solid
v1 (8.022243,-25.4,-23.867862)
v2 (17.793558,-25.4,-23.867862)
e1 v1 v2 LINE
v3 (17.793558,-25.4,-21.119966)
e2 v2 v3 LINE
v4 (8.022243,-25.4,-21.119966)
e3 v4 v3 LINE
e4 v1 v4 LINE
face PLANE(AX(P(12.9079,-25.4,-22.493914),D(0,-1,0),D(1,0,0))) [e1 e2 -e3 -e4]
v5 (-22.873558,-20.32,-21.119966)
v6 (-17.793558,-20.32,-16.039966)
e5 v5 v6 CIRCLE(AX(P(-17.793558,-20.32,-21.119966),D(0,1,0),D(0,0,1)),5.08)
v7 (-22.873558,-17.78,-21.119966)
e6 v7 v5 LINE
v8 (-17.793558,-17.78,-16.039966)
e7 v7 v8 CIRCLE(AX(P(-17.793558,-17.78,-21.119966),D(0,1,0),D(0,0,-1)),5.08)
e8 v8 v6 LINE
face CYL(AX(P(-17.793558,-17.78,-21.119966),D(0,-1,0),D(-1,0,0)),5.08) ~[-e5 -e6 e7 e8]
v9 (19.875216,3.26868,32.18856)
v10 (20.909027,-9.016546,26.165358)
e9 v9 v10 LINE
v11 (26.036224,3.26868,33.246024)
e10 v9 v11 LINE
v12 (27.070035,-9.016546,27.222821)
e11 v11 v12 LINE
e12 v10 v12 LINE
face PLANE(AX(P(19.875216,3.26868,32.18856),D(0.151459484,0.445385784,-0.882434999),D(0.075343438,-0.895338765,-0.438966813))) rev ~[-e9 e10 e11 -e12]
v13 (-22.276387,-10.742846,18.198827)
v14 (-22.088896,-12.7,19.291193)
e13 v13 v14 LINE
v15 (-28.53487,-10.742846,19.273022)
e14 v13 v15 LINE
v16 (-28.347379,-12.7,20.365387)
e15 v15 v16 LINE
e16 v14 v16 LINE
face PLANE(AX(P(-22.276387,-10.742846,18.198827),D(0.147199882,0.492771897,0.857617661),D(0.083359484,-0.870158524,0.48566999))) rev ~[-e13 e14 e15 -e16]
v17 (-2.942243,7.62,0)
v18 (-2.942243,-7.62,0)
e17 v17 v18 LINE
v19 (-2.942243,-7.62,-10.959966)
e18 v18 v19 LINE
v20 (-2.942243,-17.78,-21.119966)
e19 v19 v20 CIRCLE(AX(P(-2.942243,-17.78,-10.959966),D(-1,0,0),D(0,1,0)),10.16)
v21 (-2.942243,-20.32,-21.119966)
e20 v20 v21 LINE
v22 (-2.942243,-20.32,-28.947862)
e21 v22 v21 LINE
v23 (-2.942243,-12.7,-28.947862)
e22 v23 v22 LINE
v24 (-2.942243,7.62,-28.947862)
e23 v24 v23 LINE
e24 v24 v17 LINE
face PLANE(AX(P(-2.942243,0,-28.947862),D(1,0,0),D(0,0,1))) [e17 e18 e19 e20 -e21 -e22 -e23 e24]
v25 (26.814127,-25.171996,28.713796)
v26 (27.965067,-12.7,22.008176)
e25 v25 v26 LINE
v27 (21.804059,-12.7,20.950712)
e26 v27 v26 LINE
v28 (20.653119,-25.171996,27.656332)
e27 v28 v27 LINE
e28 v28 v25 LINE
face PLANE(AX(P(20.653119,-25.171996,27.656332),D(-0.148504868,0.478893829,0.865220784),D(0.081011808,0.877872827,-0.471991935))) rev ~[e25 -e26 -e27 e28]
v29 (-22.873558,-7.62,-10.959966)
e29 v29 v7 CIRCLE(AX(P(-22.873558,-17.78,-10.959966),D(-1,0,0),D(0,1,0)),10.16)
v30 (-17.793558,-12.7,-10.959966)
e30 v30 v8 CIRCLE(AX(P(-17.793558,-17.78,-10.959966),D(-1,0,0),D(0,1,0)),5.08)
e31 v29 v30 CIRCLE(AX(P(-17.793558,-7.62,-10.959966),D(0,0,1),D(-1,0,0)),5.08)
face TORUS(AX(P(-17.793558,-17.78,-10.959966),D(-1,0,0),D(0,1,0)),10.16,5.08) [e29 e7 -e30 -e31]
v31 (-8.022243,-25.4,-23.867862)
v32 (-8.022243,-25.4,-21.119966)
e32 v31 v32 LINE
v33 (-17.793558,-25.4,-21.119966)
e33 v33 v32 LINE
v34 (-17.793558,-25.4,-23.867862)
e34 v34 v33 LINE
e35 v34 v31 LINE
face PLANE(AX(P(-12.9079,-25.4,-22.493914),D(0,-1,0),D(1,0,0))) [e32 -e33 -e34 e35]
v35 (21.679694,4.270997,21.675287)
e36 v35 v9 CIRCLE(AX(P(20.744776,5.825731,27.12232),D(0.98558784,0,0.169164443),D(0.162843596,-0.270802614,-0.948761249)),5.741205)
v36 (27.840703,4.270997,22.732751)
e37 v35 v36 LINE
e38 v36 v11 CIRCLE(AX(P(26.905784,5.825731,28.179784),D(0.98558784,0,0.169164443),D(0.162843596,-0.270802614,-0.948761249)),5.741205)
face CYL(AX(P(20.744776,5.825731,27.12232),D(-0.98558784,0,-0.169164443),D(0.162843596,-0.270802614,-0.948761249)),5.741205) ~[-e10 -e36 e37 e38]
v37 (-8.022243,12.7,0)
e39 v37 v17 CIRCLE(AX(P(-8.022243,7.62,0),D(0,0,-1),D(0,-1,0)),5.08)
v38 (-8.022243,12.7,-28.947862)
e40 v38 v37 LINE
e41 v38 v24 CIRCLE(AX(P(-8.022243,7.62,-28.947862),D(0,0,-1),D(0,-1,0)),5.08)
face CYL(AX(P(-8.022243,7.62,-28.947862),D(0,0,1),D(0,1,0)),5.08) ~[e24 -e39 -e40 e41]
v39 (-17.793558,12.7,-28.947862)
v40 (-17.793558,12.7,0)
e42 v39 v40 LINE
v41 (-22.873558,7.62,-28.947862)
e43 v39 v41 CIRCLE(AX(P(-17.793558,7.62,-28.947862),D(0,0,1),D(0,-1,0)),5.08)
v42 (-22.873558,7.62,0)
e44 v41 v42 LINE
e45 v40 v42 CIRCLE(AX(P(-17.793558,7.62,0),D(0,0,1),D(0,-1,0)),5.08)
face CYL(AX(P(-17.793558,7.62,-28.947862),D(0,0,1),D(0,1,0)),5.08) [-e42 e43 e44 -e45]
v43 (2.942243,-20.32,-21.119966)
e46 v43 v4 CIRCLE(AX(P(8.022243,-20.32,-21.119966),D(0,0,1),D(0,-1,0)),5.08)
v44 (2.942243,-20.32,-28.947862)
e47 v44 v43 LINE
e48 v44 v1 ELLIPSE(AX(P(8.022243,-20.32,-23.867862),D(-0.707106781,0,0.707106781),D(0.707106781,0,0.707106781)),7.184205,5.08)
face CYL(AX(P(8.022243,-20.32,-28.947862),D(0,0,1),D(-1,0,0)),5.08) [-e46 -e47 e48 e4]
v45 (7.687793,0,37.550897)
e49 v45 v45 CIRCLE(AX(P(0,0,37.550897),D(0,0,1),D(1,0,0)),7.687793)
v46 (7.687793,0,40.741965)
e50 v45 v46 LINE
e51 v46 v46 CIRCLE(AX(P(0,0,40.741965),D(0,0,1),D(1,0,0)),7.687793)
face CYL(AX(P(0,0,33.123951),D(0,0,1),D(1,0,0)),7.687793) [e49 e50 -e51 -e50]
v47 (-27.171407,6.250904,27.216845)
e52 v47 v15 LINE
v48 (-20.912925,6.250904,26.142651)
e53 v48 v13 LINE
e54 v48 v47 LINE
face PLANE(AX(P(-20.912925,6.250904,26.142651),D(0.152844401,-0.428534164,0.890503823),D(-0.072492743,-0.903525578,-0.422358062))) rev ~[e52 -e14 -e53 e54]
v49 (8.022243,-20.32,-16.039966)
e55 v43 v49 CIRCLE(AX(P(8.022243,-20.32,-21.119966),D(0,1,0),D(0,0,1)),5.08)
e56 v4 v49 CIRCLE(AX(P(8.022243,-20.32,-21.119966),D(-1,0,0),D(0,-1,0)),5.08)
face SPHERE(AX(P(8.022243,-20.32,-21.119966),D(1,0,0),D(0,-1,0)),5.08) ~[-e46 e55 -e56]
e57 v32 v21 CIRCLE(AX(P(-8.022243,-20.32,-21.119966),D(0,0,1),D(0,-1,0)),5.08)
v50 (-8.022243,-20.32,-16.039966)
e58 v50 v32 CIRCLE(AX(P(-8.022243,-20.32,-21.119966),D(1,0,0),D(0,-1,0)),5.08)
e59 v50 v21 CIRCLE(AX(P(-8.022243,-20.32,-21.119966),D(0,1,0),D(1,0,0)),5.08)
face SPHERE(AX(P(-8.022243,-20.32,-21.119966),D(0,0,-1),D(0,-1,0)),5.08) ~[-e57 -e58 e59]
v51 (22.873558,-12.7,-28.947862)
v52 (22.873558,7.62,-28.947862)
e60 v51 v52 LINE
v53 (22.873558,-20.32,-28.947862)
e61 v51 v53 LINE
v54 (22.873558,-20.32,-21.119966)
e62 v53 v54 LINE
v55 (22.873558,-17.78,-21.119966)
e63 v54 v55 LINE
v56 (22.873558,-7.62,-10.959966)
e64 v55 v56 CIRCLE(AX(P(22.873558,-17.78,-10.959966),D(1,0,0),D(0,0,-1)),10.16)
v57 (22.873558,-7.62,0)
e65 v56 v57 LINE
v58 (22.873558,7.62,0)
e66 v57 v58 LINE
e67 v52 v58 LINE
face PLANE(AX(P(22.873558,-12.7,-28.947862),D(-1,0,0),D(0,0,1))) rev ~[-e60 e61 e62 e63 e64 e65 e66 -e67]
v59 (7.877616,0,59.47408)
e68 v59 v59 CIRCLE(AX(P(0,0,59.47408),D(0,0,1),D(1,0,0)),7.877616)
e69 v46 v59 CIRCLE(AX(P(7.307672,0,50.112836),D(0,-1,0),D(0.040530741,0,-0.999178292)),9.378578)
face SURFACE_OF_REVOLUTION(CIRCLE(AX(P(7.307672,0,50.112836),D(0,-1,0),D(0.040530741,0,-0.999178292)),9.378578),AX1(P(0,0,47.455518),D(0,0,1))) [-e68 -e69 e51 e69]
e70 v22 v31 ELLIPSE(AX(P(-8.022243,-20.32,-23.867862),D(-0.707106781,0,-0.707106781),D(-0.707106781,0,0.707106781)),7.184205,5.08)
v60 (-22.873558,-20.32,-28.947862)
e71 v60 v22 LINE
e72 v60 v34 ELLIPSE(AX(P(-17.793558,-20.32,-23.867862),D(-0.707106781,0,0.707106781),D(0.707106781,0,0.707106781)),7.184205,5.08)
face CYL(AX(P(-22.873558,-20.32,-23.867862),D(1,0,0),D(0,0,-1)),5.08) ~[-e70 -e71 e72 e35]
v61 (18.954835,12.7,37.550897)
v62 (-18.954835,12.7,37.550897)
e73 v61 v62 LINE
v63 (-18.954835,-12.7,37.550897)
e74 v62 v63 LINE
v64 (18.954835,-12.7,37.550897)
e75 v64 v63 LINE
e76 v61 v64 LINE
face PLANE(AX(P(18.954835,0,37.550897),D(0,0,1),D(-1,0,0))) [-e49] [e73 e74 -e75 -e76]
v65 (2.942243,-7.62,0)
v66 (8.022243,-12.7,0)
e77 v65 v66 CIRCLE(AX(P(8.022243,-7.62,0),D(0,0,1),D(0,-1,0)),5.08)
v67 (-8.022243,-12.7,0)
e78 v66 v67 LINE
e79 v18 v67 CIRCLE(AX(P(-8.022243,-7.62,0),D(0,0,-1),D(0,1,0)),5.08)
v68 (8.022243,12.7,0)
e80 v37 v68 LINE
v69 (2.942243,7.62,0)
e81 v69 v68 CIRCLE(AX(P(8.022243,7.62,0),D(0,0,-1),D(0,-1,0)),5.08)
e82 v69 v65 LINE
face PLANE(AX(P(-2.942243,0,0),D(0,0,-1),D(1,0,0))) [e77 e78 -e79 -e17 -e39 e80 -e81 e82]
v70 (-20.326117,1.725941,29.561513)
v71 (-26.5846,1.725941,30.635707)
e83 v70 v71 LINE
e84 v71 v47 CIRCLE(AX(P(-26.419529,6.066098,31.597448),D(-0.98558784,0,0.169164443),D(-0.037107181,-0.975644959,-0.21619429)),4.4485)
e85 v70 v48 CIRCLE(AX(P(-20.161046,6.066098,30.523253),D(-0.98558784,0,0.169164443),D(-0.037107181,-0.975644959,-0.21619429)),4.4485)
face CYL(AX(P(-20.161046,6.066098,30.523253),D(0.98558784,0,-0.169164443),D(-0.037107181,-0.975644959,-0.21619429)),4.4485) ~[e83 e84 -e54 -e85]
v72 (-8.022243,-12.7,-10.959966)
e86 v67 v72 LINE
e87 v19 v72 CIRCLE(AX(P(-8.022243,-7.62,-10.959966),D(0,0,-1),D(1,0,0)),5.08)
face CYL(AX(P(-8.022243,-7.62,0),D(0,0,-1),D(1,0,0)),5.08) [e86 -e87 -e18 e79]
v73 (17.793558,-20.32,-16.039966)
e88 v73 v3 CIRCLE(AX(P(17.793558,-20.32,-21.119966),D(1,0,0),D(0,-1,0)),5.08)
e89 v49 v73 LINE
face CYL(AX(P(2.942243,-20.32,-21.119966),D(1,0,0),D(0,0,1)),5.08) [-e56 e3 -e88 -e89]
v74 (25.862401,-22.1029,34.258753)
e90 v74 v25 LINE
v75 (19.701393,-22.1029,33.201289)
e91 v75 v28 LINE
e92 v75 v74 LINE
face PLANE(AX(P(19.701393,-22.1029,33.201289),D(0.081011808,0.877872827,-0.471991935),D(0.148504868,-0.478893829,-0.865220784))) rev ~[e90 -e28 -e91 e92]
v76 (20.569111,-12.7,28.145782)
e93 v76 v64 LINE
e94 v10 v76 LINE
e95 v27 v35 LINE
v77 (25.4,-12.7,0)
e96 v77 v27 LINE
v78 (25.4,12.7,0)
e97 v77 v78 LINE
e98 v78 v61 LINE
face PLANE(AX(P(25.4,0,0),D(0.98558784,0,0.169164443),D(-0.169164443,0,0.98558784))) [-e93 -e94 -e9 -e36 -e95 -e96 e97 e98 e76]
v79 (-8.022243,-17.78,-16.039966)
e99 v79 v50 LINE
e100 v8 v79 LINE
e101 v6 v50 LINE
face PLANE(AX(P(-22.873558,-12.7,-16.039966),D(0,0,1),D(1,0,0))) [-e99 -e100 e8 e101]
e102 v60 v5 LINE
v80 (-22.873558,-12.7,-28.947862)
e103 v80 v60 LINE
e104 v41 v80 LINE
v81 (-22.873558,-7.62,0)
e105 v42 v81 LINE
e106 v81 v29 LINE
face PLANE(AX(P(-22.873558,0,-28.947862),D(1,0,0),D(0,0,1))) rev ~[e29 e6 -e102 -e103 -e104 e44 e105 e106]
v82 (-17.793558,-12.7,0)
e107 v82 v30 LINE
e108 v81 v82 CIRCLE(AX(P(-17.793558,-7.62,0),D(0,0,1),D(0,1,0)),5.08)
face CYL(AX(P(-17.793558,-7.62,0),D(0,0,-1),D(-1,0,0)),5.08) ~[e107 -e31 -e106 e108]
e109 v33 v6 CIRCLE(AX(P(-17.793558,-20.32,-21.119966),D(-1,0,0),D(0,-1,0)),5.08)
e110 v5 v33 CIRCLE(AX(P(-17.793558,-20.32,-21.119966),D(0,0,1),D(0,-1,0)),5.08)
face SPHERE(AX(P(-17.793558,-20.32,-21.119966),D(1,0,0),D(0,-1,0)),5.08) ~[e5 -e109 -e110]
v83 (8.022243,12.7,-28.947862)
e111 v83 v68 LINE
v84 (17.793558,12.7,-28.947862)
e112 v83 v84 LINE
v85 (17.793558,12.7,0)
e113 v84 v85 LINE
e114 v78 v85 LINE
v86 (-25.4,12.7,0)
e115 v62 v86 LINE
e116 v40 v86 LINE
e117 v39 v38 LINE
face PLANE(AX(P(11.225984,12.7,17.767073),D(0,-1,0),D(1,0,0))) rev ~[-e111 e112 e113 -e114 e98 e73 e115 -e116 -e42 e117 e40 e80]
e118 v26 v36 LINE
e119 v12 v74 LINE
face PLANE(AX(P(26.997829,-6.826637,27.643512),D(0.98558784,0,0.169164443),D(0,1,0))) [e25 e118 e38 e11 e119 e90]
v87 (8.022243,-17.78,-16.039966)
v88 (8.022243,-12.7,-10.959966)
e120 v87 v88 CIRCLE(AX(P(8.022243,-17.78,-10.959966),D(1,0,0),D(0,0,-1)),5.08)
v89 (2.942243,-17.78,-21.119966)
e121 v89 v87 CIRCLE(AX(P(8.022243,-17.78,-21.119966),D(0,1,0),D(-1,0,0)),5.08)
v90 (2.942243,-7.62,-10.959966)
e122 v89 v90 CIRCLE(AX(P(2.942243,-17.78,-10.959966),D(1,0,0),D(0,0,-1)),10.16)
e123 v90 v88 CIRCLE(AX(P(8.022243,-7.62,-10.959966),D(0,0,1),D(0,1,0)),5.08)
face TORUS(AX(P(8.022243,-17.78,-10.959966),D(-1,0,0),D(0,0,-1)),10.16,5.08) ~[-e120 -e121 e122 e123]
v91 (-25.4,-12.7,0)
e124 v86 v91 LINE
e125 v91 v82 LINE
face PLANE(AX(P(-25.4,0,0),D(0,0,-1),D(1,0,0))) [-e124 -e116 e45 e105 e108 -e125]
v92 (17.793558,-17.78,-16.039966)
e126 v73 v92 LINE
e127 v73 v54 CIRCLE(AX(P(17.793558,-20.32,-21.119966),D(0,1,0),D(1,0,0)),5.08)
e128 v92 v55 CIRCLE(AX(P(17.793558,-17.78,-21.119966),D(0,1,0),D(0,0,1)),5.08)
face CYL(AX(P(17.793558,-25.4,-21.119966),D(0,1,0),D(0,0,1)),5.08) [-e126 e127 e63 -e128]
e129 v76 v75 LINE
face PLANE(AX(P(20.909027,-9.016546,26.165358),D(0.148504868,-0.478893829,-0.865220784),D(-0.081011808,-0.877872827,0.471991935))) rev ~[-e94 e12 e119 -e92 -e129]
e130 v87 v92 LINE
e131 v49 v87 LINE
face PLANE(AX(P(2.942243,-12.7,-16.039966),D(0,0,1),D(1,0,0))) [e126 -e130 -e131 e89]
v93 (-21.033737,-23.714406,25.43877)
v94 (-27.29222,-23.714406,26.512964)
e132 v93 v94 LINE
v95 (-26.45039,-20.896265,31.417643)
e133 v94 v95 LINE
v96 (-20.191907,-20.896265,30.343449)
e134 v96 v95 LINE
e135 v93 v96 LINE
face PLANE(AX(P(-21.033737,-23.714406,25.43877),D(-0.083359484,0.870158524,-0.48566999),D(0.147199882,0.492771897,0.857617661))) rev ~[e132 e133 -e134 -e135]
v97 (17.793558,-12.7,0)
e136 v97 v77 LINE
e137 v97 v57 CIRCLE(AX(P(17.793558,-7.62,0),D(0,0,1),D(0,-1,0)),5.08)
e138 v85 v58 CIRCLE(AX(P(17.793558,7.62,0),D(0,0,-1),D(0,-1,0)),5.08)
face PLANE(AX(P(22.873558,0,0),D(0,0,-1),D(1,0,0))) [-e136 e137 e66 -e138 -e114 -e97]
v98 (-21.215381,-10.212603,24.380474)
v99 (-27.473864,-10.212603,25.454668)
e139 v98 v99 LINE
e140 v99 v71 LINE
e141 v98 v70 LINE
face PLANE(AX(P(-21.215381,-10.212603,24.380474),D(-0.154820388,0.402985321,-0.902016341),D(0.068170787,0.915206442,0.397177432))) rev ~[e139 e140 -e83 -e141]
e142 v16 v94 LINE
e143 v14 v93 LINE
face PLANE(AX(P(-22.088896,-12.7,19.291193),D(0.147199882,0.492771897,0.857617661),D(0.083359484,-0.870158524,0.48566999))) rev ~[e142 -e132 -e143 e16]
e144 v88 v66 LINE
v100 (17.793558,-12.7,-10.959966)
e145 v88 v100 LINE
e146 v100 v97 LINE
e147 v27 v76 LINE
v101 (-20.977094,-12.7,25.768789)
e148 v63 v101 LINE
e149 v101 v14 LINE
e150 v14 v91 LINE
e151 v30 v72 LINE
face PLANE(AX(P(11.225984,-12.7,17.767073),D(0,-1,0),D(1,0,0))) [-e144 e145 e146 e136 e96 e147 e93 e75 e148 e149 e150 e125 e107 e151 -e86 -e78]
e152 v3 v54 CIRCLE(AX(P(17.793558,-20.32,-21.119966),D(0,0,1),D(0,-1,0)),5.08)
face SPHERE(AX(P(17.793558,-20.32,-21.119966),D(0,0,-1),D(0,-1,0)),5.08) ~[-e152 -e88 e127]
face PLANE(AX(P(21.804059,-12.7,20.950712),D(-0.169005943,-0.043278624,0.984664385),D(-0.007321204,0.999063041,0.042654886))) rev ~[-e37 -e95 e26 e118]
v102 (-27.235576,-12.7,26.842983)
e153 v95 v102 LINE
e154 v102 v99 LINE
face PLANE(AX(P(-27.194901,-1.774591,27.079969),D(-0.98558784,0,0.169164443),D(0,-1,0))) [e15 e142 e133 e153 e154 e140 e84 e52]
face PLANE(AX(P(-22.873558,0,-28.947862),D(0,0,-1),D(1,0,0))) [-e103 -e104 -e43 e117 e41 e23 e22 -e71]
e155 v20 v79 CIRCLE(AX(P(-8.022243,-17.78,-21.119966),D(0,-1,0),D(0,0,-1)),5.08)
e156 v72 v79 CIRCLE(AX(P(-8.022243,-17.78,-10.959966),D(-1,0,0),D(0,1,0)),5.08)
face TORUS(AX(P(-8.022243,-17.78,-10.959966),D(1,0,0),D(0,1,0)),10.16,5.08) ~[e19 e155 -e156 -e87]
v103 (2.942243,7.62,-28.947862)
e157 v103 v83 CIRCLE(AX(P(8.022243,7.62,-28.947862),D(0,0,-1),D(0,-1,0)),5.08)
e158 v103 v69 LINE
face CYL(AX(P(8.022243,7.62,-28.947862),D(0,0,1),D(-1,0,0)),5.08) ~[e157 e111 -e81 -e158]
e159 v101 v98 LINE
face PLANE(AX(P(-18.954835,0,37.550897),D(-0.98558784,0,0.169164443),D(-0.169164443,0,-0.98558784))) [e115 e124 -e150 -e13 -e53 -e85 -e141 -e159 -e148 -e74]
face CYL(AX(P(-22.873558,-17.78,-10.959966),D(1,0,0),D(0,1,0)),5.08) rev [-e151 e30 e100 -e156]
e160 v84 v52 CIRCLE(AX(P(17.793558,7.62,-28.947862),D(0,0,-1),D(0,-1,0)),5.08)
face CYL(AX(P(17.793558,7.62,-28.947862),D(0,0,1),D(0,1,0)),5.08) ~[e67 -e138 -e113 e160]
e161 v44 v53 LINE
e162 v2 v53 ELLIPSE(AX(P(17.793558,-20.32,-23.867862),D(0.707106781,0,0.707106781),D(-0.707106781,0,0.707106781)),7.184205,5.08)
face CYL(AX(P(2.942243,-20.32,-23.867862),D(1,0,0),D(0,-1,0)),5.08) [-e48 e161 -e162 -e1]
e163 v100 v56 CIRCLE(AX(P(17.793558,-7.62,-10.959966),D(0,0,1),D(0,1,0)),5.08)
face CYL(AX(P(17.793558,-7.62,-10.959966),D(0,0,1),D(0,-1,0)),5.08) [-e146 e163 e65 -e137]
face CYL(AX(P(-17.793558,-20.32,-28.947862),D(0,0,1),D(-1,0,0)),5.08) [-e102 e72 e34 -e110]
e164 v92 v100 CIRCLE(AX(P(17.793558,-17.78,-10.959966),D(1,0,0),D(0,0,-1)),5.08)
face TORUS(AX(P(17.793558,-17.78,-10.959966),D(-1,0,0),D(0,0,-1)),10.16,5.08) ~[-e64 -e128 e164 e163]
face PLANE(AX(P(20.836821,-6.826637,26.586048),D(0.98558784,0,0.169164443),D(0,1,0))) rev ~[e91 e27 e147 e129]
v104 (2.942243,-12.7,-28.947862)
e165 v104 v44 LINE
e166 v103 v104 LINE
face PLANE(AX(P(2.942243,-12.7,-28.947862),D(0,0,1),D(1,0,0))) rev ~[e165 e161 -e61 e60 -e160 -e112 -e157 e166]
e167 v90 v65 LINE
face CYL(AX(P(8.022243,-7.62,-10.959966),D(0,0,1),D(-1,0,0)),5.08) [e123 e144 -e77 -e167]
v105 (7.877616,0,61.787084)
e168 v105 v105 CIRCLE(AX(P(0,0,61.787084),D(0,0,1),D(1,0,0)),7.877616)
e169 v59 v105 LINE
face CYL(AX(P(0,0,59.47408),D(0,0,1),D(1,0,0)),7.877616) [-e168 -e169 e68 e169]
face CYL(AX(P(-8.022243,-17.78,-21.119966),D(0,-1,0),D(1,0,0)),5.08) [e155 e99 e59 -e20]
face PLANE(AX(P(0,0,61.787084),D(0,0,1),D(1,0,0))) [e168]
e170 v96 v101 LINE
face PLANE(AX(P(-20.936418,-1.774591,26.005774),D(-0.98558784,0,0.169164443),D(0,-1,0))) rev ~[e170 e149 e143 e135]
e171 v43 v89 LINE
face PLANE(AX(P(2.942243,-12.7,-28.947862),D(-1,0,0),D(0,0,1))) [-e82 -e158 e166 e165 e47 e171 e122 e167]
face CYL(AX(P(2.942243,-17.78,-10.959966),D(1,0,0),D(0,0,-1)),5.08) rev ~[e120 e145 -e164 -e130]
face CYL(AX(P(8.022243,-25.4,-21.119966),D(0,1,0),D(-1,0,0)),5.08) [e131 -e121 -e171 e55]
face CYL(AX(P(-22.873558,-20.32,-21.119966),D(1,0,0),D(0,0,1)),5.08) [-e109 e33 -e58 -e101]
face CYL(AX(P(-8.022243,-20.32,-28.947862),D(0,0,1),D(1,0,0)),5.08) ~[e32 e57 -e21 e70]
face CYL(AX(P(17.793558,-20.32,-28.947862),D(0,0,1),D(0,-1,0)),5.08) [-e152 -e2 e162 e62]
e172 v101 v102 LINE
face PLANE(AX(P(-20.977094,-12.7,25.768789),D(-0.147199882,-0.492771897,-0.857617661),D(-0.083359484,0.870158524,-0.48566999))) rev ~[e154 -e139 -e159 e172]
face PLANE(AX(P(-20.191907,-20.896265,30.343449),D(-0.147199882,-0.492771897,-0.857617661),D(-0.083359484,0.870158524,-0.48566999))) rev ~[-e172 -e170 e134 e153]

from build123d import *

# Parameters (mm, degrees)
F0_W      = 19.9313152116
F0_H      = 28.9478618652
F1_DEPTH  = 12.7
F2_W      = 19.9313152116
F2_H      = 12.9078961909
F3_DEPTH  = 12.7
F4_F1_R   = 5.08
F4_F2_R   = 5.08
F8_DEPTH  = 6.2511
F10_DEPTH = 6.35


with BuildPart() as f1:
    # F0 (on Front) → F1 (new body, symmetric)
    with BuildSketch(Plane.XZ):
        Polygon((22.873558104, 0), (25.4, 0), (18.9548347086, 37.5508967185), (0, 37.5508967185), (0, 0), (2.9422428925, 0), align=None)
        with Locations((12.9079004982, -14.4739309326)):
            Rectangle(F0_W, F0_H)
        Polygon((0, 0), (0, 37.5508967185), (-18.9548347086, 37.5508967185), (-25.4, 0), (-22.873558104, 0), (-2.9422428925, 0), align=None)
        with Locations((-12.9079004982, -14.4739309326)):
            Rectangle(F0_W, F0_H)
    extrude(amount=F1_DEPTH, both=True)

    # F2 (on face) → F3 (join)
    with BuildSketch(Plane.XZ.offset(12.7)):
        with Locations((12.9079004982, -22.4939137697)):
            Rectangle(F2_W, F2_H)
        with Locations((-12.9079004982, -22.4939137697)):
            Rectangle(F2_W, F2_H)
    extrude(amount=F3_DEPTH)

    # F4: fillet of radius 5.08 on 18 edges, made by hand

    # F4_f1
    f4_f1_edges = [f1.edges().sort_by_distance(p)[0] for p in [
        (12.9079004982, -12.7, -16.0399656743),
        (-12.9079004982, -12.7, -16.0399656743),
    ]]
    fillet(f4_f1_edges, radius=F4_F1_R)

    # F4_f2
    f4_f2_edges = [f1.edges().sort_by_distance(p)[0] for p in [
        (-2.9422428925, -25.4, -22.4939137697),
        (-12.9079004982, -25.4, -16.0399656743),
        (-22.873558104, -25.4, -22.4939137697),
        (-12.9079004982, -25.4, -28.9478618652),
        (22.873558104, -25.4, -22.4939137697),
        (12.9079004982, -25.4, -16.0399656743),
        (2.9422428925, -25.4, -22.4939137697),
        (12.9079004982, -25.4, -28.9478618652),
        (-2.9422428925, -21.59, -16.0399656743),
        (-22.873558104, -21.59, -16.0399656743),
        (22.873558104, 12.7, -14.4739309326),
        (2.9422428925, 12.7, -14.4739309326),
        (-22.873558104, 12.7, -14.4739309326),
        (-2.9422428925, 12.7, -14.4739309326),
        (22.873558104, -12.7, -5.4799828371),
        (2.9422428925, -12.7, -5.4799828371),
        (2.9422428925, -14.1878975516, -14.5520681227),
        (22.873558104, -14.1878975516, -14.5520681227),
        (-22.873558104, -14.1878975516, -14.5520681227),
        (-2.9422428925, -14.1878975516, -14.5520681227),
    ]]
    fillet(f4_f2_edges, radius=F4_F2_R)

    # F5 (on Front) → F6 (revolve)
    with BuildSketch(Plane.XZ):
        with BuildLine():
            Line((7.6877931133, 33.1239514053), (7.6877931133, 40.7419648703))
            ThreePointArc((7.6877931133, 40.7419648703), (16.6857685514, 50.0178025185), (7.8776162118, 59.4740797153))
            Line((7.8776162118, 59.4740797153), (7.8776162118, 61.787083745))
            Line((7.8776162118, 61.787083745), (0, 61.787083745))
            Line((0, 61.787083745), (0, 33.1239514053))
            Line((0, 33.1239514053), (7.6877931133, 33.1239514053))
        make_face()
    revolve(axis=Axis((0, 0, 47.4555175751), (0, 0, 1)))

    # F7 (on face) → F8 (join)
    with BuildSketch(Plane(origin=(24.6731381341, 0, 4.234851027), x_dir=(0, 1, 0), z_dir=(0.9855878404, 0, 0.1691644433))):
        with BuildLine():
            Line((-12.7, 16.9602958167), (4.2709973641, 17.6954660565))
            ThreePointArc((4.2709973641, 17.6954660565), (11.5417566939, 23.7592524776), (3.2686796257, 28.3624733953))
            Line((3.2686796257, 28.3624733953), (-9.0165464208, 22.251194343))
            Line((-9.0165464208, 22.251194343), (-22.1028998209, 29.3900118281))
            Line((-22.1028998209, 29.3900118281), (-25.1719959147, 23.7639713547))
            Line((-25.1719959147, 23.7639713547), (-12.7, 16.9602958167))
        make_face()
    extrude(amount=F8_DEPTH)

    # F9 (on face) → F10 (join)
    with BuildSketch(Plane(origin=(-24.6731381341, 0, 4.234851027), x_dir=(0, -1, 0), z_dir=(-0.9855878404, 0, 0.1691644433))):
        with BuildLine():
            Line((10.2126034461, 20.4402103872), (-1.7259411979, 25.6970115006))
            ThreePointArc((-1.7259411979, 25.6970115006), (-8.7725675478, 30.2032799266), (-6.2509044074, 22.2281552851))
            Line((-6.2509044074, 22.2281552851), (10.7428459451, 14.1681702808))
            Line((10.7428459451, 14.1681702808), (12.7, 15.2765091522))
            Line((12.7, 15.2765091522), (12.7, 21.8488262713))
            Line((12.7, 21.8488262713), (10.2126034461, 20.4402103872))
        make_face()
        Polygon((20.8962647478, 26.4903815939), (12.7, 21.8488262713), (12.7, 15.2765091522), (23.7144064158, 21.5139817446), align=None)
    extrude(amount=F10_DEPTH)


solid = f1.part
